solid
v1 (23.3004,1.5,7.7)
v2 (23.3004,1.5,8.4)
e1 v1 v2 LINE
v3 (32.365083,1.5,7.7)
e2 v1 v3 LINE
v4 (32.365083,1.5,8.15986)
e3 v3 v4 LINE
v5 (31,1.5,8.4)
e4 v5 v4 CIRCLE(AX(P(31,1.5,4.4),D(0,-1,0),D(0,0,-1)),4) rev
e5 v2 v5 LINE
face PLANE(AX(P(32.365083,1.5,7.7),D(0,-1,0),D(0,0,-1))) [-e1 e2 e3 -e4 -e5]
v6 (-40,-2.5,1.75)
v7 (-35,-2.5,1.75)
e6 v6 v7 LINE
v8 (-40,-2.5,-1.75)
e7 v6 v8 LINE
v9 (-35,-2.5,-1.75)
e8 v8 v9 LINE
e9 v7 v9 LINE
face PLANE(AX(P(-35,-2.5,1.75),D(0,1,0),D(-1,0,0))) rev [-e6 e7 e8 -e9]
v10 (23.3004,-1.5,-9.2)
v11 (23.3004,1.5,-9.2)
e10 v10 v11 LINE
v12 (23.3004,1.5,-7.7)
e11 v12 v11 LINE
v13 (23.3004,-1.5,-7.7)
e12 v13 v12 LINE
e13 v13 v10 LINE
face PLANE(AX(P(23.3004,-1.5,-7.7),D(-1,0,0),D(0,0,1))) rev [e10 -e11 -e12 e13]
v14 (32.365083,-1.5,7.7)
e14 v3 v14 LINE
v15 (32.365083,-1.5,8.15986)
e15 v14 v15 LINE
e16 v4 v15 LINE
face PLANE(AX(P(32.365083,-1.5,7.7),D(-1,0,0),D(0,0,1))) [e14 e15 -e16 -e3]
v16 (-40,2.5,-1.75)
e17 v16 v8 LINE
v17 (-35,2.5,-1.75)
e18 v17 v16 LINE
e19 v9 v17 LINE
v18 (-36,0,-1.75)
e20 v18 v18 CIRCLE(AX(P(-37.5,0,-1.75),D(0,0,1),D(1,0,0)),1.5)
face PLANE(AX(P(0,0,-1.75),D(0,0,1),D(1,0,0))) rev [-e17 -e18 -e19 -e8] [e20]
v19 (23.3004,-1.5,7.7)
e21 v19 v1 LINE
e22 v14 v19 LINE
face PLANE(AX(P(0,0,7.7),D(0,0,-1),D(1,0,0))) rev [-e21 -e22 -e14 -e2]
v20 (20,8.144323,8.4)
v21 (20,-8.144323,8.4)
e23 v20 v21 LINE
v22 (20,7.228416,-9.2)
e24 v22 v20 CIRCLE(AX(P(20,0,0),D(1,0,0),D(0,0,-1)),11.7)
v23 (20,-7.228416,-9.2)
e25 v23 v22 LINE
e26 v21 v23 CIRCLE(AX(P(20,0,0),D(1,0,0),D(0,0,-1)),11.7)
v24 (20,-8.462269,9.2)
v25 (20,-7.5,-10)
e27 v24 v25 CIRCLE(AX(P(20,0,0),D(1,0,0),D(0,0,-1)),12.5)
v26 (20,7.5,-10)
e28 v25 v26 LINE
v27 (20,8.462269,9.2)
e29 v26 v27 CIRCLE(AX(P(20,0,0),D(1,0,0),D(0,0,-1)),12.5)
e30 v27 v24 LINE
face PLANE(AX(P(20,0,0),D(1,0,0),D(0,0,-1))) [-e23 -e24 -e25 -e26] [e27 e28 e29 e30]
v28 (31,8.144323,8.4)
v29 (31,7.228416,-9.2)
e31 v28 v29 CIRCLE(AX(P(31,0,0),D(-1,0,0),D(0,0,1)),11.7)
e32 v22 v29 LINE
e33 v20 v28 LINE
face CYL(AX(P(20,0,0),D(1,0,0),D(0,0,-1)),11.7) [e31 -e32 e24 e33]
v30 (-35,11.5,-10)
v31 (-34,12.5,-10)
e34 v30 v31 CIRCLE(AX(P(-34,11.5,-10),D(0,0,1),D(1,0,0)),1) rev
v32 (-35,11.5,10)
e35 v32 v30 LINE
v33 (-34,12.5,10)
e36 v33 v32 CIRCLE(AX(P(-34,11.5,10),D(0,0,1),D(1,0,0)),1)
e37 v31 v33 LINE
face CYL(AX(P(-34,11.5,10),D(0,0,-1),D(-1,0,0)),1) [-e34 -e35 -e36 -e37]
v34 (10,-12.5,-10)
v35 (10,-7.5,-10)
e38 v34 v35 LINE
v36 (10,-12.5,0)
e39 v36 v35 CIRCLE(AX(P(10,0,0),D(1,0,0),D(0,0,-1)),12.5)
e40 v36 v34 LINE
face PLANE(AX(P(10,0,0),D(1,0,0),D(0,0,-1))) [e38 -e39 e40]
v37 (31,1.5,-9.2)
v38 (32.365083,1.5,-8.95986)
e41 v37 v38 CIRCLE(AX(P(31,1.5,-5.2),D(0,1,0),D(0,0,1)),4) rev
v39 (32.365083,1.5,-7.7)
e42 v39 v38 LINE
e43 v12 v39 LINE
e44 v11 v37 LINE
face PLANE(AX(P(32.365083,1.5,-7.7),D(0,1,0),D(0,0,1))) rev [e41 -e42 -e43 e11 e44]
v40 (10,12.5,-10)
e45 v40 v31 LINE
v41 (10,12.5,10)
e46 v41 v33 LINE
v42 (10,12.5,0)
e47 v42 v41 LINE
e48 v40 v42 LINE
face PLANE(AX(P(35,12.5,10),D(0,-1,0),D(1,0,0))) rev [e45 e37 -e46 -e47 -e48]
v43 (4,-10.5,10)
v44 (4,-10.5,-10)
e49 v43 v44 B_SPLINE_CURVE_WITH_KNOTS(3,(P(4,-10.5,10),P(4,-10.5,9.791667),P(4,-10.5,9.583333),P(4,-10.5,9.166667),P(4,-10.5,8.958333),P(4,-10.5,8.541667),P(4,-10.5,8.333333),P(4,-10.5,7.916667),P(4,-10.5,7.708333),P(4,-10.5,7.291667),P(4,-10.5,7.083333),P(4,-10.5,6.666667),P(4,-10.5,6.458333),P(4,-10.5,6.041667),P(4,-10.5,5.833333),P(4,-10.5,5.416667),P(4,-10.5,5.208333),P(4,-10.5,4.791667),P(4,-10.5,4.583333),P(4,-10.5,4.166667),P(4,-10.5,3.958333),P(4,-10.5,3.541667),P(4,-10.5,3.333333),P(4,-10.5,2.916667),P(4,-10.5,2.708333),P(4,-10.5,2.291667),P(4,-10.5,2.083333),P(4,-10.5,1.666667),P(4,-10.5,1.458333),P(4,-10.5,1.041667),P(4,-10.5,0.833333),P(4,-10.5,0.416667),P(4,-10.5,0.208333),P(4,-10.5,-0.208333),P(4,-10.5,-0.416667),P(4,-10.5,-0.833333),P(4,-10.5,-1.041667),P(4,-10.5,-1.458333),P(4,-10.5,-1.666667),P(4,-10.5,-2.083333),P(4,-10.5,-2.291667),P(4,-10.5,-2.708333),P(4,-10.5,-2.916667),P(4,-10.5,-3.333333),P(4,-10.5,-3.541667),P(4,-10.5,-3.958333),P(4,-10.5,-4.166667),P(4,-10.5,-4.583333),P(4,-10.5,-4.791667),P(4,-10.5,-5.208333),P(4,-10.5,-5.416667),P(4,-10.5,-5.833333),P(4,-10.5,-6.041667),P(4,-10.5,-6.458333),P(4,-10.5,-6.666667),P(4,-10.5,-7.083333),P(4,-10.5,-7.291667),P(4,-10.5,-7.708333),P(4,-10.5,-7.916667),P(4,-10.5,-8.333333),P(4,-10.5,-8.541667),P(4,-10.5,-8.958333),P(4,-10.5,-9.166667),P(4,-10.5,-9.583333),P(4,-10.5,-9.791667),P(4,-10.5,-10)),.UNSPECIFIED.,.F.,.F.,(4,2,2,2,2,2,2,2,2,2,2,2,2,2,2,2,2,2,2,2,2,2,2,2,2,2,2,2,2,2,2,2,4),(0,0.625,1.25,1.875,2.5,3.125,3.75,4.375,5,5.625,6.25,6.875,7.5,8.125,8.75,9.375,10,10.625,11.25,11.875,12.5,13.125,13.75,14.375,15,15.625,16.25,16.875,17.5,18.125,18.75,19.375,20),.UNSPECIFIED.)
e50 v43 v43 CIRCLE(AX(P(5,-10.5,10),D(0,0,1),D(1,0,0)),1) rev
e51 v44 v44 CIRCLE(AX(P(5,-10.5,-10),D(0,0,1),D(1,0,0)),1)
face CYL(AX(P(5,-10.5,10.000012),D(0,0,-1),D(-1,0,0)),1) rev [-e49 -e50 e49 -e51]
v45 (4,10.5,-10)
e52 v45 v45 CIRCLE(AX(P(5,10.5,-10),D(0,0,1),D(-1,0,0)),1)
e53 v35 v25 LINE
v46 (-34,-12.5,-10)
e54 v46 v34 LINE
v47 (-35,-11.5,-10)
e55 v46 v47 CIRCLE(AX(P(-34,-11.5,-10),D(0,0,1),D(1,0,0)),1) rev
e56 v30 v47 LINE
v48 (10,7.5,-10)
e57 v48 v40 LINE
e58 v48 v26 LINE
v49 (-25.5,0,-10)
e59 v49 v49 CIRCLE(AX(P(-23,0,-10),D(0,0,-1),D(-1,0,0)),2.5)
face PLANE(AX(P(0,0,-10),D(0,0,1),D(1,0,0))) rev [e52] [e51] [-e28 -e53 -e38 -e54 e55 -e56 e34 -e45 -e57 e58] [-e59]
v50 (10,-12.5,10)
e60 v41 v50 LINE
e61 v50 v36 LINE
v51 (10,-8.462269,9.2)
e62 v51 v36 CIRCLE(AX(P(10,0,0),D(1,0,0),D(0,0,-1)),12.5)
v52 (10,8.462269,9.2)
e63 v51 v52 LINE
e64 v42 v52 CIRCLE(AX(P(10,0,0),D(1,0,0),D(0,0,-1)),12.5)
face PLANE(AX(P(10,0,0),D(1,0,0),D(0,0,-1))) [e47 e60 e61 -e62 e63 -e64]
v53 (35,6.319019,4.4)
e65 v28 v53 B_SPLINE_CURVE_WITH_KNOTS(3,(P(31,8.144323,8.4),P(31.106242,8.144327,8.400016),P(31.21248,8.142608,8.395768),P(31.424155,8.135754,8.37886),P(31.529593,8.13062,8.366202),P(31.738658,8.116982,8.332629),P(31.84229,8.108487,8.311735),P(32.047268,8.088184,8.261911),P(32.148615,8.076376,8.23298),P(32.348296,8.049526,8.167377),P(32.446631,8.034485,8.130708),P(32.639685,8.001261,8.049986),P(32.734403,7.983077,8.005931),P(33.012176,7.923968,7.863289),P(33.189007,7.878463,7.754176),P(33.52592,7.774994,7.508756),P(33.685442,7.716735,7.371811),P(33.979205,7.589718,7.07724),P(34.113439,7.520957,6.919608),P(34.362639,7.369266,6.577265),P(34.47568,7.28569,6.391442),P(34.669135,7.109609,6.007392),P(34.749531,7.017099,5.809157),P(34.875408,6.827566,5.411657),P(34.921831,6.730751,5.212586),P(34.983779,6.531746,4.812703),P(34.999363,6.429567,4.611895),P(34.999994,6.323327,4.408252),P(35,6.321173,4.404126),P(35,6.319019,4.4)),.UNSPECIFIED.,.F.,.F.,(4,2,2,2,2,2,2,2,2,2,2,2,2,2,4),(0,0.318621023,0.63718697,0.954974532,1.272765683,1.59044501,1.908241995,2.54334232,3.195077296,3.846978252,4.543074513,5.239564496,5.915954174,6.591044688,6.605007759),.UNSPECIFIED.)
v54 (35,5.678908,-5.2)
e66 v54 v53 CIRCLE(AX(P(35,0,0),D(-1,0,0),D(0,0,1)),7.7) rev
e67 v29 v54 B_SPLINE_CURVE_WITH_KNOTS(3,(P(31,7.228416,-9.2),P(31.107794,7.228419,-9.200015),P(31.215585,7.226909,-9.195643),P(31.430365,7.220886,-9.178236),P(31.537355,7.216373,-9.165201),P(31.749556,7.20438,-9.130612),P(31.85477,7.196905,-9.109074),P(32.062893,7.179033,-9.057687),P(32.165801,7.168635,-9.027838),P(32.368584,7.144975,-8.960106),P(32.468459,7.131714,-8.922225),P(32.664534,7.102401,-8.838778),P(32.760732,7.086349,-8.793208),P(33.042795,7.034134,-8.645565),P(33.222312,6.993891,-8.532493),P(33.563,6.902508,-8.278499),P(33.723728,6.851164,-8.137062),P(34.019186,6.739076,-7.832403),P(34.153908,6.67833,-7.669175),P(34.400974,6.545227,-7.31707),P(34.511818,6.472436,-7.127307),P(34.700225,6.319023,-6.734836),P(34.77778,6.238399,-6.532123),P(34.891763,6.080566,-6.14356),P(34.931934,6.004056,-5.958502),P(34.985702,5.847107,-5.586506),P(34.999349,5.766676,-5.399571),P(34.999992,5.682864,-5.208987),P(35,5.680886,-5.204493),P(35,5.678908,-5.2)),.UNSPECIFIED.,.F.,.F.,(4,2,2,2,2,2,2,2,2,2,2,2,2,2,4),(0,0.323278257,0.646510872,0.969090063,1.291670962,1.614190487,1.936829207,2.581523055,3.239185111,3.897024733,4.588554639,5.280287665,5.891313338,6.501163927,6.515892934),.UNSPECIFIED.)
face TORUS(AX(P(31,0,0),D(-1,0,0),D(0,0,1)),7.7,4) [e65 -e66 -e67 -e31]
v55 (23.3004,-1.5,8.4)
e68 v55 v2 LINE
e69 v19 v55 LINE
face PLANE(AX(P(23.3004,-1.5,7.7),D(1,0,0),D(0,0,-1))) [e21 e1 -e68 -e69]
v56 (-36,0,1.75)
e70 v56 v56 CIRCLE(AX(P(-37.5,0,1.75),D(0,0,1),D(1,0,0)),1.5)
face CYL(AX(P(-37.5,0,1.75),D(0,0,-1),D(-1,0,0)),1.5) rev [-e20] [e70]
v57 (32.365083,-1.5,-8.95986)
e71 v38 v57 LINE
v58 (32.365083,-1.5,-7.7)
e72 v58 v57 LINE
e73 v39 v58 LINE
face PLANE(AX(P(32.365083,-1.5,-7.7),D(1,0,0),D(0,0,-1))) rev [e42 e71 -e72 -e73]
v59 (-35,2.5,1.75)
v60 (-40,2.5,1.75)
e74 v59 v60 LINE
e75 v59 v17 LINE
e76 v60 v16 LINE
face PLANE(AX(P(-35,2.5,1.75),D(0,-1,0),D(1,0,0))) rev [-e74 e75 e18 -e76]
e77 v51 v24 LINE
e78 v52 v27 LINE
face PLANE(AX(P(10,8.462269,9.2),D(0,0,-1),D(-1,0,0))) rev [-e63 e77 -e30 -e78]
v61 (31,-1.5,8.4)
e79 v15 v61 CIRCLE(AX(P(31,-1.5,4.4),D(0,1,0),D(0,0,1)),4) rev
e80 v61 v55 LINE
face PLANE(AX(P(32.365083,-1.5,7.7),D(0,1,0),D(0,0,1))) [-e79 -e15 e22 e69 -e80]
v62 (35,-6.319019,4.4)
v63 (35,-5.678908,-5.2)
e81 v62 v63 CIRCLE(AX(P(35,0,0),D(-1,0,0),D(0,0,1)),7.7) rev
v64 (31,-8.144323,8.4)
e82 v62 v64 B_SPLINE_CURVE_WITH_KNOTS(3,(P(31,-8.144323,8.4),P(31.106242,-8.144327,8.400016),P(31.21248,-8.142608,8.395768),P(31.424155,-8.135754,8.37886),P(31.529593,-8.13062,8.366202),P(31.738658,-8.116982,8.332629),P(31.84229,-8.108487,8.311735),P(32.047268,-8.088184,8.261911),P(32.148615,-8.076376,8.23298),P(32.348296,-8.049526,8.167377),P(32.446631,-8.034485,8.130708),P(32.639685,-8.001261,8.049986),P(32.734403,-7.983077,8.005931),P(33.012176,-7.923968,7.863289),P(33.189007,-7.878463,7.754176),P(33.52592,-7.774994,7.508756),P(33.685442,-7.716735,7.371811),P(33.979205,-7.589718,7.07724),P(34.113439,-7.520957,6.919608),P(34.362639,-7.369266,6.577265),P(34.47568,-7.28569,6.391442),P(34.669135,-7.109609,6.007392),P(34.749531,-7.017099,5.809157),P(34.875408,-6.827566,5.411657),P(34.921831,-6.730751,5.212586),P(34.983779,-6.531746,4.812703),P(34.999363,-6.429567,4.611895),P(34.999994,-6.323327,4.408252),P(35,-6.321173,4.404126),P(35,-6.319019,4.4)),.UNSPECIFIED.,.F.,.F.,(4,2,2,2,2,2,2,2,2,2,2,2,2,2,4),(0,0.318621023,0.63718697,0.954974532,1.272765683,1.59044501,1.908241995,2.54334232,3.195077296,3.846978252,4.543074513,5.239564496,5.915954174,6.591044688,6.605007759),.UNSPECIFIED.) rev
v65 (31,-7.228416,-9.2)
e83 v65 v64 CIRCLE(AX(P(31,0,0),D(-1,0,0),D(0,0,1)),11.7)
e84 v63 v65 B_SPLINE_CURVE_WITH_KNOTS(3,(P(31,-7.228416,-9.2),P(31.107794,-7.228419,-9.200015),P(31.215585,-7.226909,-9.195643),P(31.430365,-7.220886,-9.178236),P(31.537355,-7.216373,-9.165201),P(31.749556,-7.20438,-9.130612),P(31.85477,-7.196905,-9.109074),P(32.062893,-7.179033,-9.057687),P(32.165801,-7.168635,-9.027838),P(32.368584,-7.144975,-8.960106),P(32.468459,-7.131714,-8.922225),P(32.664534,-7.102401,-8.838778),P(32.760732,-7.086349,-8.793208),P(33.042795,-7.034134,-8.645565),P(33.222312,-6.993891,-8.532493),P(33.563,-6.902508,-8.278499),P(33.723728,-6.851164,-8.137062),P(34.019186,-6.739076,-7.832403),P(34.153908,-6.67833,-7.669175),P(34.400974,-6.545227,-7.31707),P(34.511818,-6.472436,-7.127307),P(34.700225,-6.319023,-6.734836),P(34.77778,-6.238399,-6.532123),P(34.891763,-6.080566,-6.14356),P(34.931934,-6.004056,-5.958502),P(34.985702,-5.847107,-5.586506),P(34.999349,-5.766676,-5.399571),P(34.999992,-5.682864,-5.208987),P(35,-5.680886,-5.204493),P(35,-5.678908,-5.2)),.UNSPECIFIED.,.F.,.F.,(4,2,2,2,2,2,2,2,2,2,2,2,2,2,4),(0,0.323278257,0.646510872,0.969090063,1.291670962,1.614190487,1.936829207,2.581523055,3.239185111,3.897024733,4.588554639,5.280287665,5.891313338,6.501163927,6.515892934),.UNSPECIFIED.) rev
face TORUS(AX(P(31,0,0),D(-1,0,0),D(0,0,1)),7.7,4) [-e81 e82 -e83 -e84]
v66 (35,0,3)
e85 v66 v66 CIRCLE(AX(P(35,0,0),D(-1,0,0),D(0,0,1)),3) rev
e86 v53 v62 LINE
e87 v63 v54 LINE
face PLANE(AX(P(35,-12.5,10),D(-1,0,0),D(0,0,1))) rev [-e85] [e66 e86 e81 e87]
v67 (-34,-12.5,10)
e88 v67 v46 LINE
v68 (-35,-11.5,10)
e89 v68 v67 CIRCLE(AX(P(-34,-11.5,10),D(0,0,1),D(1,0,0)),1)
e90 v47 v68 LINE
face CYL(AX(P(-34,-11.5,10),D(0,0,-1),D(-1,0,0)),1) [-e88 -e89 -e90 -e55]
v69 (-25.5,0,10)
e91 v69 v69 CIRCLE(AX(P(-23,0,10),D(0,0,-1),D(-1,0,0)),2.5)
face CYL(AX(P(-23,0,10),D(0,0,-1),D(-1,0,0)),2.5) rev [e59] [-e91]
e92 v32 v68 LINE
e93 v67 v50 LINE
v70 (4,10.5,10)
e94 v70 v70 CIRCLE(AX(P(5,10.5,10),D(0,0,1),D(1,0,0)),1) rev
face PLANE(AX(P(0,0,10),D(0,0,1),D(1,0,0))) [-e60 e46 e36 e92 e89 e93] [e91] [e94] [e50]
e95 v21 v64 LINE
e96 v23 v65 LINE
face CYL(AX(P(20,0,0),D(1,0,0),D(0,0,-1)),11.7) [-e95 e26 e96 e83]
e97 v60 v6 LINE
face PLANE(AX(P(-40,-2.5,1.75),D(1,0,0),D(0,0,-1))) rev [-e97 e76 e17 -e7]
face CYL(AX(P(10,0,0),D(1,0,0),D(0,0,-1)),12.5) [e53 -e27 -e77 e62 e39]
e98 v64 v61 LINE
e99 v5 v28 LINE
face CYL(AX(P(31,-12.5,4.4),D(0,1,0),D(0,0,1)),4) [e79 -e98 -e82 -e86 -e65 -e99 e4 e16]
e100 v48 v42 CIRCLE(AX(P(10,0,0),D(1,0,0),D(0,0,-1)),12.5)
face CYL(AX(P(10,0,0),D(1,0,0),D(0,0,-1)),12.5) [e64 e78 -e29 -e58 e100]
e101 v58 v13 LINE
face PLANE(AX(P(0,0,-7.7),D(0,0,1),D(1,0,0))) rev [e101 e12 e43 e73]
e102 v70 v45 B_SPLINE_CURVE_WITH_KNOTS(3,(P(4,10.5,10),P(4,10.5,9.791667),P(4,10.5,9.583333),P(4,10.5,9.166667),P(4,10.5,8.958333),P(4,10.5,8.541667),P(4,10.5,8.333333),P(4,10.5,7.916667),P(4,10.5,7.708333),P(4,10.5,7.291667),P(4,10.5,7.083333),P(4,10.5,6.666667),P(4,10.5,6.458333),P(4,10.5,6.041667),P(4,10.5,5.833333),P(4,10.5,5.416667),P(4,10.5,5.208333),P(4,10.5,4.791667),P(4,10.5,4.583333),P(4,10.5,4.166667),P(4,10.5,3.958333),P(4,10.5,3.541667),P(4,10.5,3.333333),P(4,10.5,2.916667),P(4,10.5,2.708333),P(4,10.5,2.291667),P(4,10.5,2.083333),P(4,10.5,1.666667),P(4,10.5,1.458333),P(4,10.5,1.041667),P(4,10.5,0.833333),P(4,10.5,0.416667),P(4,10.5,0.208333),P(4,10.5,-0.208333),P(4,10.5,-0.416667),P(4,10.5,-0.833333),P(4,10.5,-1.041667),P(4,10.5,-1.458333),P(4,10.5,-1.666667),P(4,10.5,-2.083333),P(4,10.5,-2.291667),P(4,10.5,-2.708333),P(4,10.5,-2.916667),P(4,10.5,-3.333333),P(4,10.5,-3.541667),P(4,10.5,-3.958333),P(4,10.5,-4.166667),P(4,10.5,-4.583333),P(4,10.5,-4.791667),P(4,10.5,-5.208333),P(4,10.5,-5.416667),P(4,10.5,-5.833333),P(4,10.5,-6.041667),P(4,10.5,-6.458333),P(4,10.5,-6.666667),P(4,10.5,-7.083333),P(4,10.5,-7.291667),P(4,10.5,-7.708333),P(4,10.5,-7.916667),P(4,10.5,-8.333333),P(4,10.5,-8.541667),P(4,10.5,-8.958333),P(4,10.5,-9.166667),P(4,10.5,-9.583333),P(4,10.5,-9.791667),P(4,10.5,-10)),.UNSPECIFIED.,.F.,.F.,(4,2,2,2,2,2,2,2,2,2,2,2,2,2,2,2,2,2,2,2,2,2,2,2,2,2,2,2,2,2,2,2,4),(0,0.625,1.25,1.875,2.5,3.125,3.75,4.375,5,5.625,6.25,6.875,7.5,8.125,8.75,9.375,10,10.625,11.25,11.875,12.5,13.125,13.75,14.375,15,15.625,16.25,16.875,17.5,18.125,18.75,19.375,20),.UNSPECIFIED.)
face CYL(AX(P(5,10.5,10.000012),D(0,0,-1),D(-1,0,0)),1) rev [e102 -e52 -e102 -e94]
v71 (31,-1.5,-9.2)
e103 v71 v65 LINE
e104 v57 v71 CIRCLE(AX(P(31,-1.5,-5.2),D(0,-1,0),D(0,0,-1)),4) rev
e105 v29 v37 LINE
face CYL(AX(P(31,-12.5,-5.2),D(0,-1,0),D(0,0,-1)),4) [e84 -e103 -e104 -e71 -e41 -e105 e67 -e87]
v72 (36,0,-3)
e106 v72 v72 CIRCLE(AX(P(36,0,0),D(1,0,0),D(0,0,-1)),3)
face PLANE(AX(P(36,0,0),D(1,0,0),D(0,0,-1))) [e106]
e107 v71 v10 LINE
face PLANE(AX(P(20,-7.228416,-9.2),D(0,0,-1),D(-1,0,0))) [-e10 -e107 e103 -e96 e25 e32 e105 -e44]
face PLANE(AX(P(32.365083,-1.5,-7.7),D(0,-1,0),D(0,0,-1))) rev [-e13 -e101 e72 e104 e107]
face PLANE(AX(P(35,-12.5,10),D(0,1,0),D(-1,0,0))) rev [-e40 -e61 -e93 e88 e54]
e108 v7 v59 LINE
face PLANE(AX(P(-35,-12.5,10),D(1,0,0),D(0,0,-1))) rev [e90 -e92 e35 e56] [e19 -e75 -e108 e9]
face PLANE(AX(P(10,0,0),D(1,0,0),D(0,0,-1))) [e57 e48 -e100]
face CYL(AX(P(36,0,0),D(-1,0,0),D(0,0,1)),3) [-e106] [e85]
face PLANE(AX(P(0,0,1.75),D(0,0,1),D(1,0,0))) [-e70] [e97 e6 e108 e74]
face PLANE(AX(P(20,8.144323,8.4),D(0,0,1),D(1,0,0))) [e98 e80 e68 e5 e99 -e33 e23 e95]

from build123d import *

# Parameters (mm, degrees)
BOSS_EXTRUDE1_DEPTH     = 10
CUT_EXTRUDE2_DEPTH      = 25
SKETCH4_W               = 2.420711262391846
SKETCH4_H               = 16.924538398432034
CUT_EXTRUDE3_DEPTH      = 25
CUT_EXTRUDE4_DEPTH      = 15.000000000000002
FILLET1_R               = 4
SKETCH6_R               = 3
BOSS_EXTRUDE2_DEPTH     = 1
SKETCH7_W               = 9.06468295299787
SKETCH7_H               = 3
CUT_EXTRUDE5_DEPTH      = 1.5
FILLET2_R               = 1
SKETCH8_R               = 1.500000000000004
BOSS_EXTRUDE3_DEPTH     = 1.75
CUT_EXTRUDE7_DEPTH      = 47.435439052516784
CUT_EXTRUDE7_DEPTH_BACK = 47.435439052516784
SKETCH9_R               = 1
SKETCH10_R              = 2.4999999999999982
CUT_EXTRUDE8_DEPTH      = 47.435439052516784


with BuildPart() as part:
    # Sketch1 → Boss-Extrude1 (new, symmetric)
    with BuildSketch(Plane.XY):
        Polygon((34.99999999999999, -12.5), (-35.00000000000001, -12.500000000000005), (-35.00000000000001, 12.499999999999995), (34.99999999999999, 12.500000000000002), align=None)
    extrude(amount=BOSS_EXTRUDE1_DEPTH, both=True)

    # Sketch2 → Cut-Extrude2 (cut)
    with BuildSketch(Plane(origin=(34.99999999999999, 0, 0), x_dir=(0, 0, -1), z_dir=(1, 0, 0))):
        with BuildLine():
            Line((-10, 12.500000000000002), (-10, 7.500000000000002))
            ThreePointArc((-9.999999999999998, 7.500000000000003), (-5.590169943749482, 11.180339887498945), (-1.821e-14, 12.500000000000004))
            Line((-1.776e-14, 12.500000000000002), (-10, 12.500000000000002))
        make_face()
        with BuildLine():
            Line((10, 12.500000000000002), (-1.776e-14, 12.500000000000002))
            ThreePointArc((-1.821e-14, 12.500000000000004), (5.590169943749467, 11.180339887498956), (10, 7.500000000000001))
            Line((10, 7.500000000000002), (10, 12.500000000000002))
        make_face()
        with BuildLine():
            ThreePointArc((9.999999999999998, -7.500000000000003), (5.590169943749469, -11.180339887498953), (-1.554e-14, -12.5))
            Line((-1.599e-14, -12.5), (10, -12.5))
            Line((10, -12.5), (10, -7.500000000000002))
        make_face()
        with BuildLine():
            ThreePointArc((-1.554e-14, -12.5), (-5.590169943749482, -11.180339887498945), (-10, -7.500000000000001))
            Line((-10, -7.500000000000002), (-10, -12.5))
            Line((-10, -12.5), (-1.599e-14, -12.5))
        make_face()
    extrude(amount=-CUT_EXTRUDE2_DEPTH, mode=Mode.SUBTRACT)

    # Sketch4 → Cut-Extrude3 (cut)
    with BuildSketch(Plane(origin=(34.99999999999999, 0, 0), x_dir=(0, 0, -1), z_dir=(1, 0, 0))):
        with Locations((-10.41035563119592, 0)):
            Rectangle(SKETCH4_W, SKETCH4_H)
    extrude(amount=-CUT_EXTRUDE3_DEPTH, mode=Mode.SUBTRACT)

    # Sketch5 → Cut-Extrude4 (cut)
    with BuildSketch(Plane(origin=(34.99999999999999, 0, 0), x_dir=(0, 0, -1), z_dir=(1, 0, 0))):
        with BuildLine():
            Line((-9.199999999999998, 8.462269199216015), (-9.199999999999996, -8.462269199216017))
            ThreePointArc((-9.199999999999996, -8.462269199216017), (0.6256920192394629, -12.484330558626684), (10, -7.500000000000002))
            Line((10, -7.500000000000002), (10, 7.500000000000002))
            ThreePointArc((10, 7.500000000000002), (0.6256920192394629, 12.484330558626686), (-9.199999999999998, 8.462269199216015))
        make_face()
        with BuildLine():
            Line((-8.399999999999997, 8.144323176298942), (-8.399999999999997, -8.144323176298942))
            ThreePointArc((-8.399999999999997, -8.144323176298942), (0.608047219709459, -11.684189256367068), (9.2, -7.228416147400481))
            Line((9.2, -7.228416147400481), (9.2, 7.228416147400481))
            ThreePointArc((9.2, 7.228416147400481), (0.6080472197094615, 11.684189256367066), (-8.399999999999997, 8.144323176298942))
        make_face(mode=Mode.SUBTRACT)
    extrude(amount=-CUT_EXTRUDE4_DEPTH, mode=Mode.SUBTRACT)

    # Fillet1
    # the kernel refuses this fillet: 4 mm, written as the material it takes off along each edge
    with BuildSketch(Plane(origin=(34.99999999999999, -4.44e-15, 6.7e-16), x_dir=(0, -0.1880210929197643, -0.982164990527181), z_dir=(0, -0.982164990527181, 0.1880210929197643))) as fillet1_piece_1:
        with BuildLine():
            CenterArc((11.700000000000003 - FILLET1_R, -FILLET1_R), FILLET1_R, 0, 89.99999999999999)
            Line((11.700000000000003 - FILLET1_R, 0), (11.700000000000003, 0))
            Line((11.700000000000003, 0), (11.700000000000003, -FILLET1_R))
        make_face()
    revolve(axis=Axis((34.99999999999999, -4.44e-15, 6.7e-16), (1, 0, 0)), revolution_arc=195.71664993769073, mode=Mode.SUBTRACT)
    with BuildSketch(Plane(origin=(34.99999999999999, -17.22841614740048, -9.2), x_dir=(-1, 0, 0), z_dir=(0, 1, 0))) as fillet1_piece_2:
        with BuildLine():
            CenterArc((FILLET1_R, FILLET1_R), FILLET1_R, 180, 90)
            Line((0, FILLET1_R), (0, 0))
            Line((0, 0), (FILLET1_R, 0))
        make_face()
    extrude(amount=34.45683229480096, mode=Mode.SUBTRACT)
    with BuildSketch(Plane(origin=(34.99999999999999, 0, 6.7e-16), x_dir=(0, 0.0850574768635666, 0.9963760462945724), z_dir=(0, 0.9963760462945724, -0.0850574768635666))) as fillet1_piece_3:
        with BuildLine():
            CenterArc((11.700000000000003 - FILLET1_R, -FILLET1_R), FILLET1_R, 0, 90)
            Line((11.700000000000003 - FILLET1_R, 0), (11.700000000000003, 0))
            Line((11.700000000000003, 0), (11.700000000000003, -FILLET1_R))
        make_face()
    revolve(axis=Axis((34.99999999999999, 0, 6.7e-16), (1, 0, 0)), revolution_arc=195.71664993769085, mode=Mode.SUBTRACT)
    with BuildSketch(Plane(origin=(34.99999999999999, 18.14432317629894, 8.399999999999997), x_dir=(-1, 0, 0), z_dir=(0, -1, 0))) as fillet1_piece_4:
        with BuildLine():
            CenterArc((FILLET1_R, FILLET1_R), FILLET1_R, 180, 90)
            Line((0, FILLET1_R), (0, 0))
            Line((0, 0), (FILLET1_R, 0))
        make_face()
    extrude(amount=36.28864635259788, mode=Mode.SUBTRACT)

    # Sketch6 → Boss-Extrude2 (add)
    with BuildSketch(Plane(origin=(34.99999999999999, 0, 0), x_dir=(0, 0, -1), z_dir=(1, 0, 0))):
        with Locations(Location((0, 0, 0), (0, 0, 180))):
            Circle(SKETCH6_R)
    extrude(amount=BOSS_EXTRUDE2_DEPTH)

    # Sketch7 → Cut-Extrude5 (cut)
    with BuildSketch(Plane(origin=(0, 0, -9.2), x_dir=(-1, 0, 0), z_dir=(0, 0, -1))):
        with Locations((-27.832741428017933, 0)):
            Rectangle(SKETCH7_W, SKETCH7_H)
    cut_extrude5 = extrude(amount=-CUT_EXTRUDE5_DEPTH, mode=Mode.SUBTRACT)

    # Mirror1: Cut-Extrude5 across plane
    add(cut_extrude5.mirror(Plane.XY), mode=Mode.SUBTRACT)

    # Fillet2
    fillet2_edges = [part.edges().sort_by_distance(p)[0] for p in [
        (-35.00000000000001, 12.499999999999995, 0),
        (-35.00000000000001, -12.500000000000005, 0),
    ]]
    fillet(fillet2_edges, radius=FILLET2_R)

    # Sketch8 → Boss-Extrude3 (add, symmetric)
    with BuildSketch(Plane.XY):
        Polygon((-35.00000000000001, -2.4999999999999987), (-40.00000000000001, -2.499999999999998), (-40.00000000000001, 2.500000000000002), (-35.00000000000001, 2.4999999999999987), align=None)
        with Locations((-37.50000000000001, 2.17e-15)):
            Circle(SKETCH8_R, mode=Mode.SUBTRACT)
    extrude(amount=BOSS_EXTRUDE3_DEPTH, both=True)

    # Sketch9 → Cut-Extrude7 (cut, two sides: drawn at the far end of the back side and taken through both)
    with BuildSketch(Plane.XY.offset(10).offset(-CUT_EXTRUDE7_DEPTH_BACK)):
        with Locations(Location((4.99999999999999, -10.500000000000004, 0), (0, 0, 180))):
            Circle(SKETCH9_R)
        with Locations(Location((4.99999999999999, 10.500000000000004, 0), (0, 0, 180))):
            Circle(SKETCH9_R)
    extrude(amount=CUT_EXTRUDE7_DEPTH + CUT_EXTRUDE7_DEPTH_BACK, mode=Mode.SUBTRACT)

    # Sketch10 → Cut-Extrude8 (cut, through all)
    with BuildSketch(Plane(origin=(0, 0, -10), x_dir=(-1, 0, 0), z_dir=(0, 0, -1))):
        with Locations((23.00000000000001, 0)):
            Circle(SKETCH10_R)
    extrude(amount=-CUT_EXTRUDE8_DEPTH, mode=Mode.SUBTRACT)


solid = part.part
